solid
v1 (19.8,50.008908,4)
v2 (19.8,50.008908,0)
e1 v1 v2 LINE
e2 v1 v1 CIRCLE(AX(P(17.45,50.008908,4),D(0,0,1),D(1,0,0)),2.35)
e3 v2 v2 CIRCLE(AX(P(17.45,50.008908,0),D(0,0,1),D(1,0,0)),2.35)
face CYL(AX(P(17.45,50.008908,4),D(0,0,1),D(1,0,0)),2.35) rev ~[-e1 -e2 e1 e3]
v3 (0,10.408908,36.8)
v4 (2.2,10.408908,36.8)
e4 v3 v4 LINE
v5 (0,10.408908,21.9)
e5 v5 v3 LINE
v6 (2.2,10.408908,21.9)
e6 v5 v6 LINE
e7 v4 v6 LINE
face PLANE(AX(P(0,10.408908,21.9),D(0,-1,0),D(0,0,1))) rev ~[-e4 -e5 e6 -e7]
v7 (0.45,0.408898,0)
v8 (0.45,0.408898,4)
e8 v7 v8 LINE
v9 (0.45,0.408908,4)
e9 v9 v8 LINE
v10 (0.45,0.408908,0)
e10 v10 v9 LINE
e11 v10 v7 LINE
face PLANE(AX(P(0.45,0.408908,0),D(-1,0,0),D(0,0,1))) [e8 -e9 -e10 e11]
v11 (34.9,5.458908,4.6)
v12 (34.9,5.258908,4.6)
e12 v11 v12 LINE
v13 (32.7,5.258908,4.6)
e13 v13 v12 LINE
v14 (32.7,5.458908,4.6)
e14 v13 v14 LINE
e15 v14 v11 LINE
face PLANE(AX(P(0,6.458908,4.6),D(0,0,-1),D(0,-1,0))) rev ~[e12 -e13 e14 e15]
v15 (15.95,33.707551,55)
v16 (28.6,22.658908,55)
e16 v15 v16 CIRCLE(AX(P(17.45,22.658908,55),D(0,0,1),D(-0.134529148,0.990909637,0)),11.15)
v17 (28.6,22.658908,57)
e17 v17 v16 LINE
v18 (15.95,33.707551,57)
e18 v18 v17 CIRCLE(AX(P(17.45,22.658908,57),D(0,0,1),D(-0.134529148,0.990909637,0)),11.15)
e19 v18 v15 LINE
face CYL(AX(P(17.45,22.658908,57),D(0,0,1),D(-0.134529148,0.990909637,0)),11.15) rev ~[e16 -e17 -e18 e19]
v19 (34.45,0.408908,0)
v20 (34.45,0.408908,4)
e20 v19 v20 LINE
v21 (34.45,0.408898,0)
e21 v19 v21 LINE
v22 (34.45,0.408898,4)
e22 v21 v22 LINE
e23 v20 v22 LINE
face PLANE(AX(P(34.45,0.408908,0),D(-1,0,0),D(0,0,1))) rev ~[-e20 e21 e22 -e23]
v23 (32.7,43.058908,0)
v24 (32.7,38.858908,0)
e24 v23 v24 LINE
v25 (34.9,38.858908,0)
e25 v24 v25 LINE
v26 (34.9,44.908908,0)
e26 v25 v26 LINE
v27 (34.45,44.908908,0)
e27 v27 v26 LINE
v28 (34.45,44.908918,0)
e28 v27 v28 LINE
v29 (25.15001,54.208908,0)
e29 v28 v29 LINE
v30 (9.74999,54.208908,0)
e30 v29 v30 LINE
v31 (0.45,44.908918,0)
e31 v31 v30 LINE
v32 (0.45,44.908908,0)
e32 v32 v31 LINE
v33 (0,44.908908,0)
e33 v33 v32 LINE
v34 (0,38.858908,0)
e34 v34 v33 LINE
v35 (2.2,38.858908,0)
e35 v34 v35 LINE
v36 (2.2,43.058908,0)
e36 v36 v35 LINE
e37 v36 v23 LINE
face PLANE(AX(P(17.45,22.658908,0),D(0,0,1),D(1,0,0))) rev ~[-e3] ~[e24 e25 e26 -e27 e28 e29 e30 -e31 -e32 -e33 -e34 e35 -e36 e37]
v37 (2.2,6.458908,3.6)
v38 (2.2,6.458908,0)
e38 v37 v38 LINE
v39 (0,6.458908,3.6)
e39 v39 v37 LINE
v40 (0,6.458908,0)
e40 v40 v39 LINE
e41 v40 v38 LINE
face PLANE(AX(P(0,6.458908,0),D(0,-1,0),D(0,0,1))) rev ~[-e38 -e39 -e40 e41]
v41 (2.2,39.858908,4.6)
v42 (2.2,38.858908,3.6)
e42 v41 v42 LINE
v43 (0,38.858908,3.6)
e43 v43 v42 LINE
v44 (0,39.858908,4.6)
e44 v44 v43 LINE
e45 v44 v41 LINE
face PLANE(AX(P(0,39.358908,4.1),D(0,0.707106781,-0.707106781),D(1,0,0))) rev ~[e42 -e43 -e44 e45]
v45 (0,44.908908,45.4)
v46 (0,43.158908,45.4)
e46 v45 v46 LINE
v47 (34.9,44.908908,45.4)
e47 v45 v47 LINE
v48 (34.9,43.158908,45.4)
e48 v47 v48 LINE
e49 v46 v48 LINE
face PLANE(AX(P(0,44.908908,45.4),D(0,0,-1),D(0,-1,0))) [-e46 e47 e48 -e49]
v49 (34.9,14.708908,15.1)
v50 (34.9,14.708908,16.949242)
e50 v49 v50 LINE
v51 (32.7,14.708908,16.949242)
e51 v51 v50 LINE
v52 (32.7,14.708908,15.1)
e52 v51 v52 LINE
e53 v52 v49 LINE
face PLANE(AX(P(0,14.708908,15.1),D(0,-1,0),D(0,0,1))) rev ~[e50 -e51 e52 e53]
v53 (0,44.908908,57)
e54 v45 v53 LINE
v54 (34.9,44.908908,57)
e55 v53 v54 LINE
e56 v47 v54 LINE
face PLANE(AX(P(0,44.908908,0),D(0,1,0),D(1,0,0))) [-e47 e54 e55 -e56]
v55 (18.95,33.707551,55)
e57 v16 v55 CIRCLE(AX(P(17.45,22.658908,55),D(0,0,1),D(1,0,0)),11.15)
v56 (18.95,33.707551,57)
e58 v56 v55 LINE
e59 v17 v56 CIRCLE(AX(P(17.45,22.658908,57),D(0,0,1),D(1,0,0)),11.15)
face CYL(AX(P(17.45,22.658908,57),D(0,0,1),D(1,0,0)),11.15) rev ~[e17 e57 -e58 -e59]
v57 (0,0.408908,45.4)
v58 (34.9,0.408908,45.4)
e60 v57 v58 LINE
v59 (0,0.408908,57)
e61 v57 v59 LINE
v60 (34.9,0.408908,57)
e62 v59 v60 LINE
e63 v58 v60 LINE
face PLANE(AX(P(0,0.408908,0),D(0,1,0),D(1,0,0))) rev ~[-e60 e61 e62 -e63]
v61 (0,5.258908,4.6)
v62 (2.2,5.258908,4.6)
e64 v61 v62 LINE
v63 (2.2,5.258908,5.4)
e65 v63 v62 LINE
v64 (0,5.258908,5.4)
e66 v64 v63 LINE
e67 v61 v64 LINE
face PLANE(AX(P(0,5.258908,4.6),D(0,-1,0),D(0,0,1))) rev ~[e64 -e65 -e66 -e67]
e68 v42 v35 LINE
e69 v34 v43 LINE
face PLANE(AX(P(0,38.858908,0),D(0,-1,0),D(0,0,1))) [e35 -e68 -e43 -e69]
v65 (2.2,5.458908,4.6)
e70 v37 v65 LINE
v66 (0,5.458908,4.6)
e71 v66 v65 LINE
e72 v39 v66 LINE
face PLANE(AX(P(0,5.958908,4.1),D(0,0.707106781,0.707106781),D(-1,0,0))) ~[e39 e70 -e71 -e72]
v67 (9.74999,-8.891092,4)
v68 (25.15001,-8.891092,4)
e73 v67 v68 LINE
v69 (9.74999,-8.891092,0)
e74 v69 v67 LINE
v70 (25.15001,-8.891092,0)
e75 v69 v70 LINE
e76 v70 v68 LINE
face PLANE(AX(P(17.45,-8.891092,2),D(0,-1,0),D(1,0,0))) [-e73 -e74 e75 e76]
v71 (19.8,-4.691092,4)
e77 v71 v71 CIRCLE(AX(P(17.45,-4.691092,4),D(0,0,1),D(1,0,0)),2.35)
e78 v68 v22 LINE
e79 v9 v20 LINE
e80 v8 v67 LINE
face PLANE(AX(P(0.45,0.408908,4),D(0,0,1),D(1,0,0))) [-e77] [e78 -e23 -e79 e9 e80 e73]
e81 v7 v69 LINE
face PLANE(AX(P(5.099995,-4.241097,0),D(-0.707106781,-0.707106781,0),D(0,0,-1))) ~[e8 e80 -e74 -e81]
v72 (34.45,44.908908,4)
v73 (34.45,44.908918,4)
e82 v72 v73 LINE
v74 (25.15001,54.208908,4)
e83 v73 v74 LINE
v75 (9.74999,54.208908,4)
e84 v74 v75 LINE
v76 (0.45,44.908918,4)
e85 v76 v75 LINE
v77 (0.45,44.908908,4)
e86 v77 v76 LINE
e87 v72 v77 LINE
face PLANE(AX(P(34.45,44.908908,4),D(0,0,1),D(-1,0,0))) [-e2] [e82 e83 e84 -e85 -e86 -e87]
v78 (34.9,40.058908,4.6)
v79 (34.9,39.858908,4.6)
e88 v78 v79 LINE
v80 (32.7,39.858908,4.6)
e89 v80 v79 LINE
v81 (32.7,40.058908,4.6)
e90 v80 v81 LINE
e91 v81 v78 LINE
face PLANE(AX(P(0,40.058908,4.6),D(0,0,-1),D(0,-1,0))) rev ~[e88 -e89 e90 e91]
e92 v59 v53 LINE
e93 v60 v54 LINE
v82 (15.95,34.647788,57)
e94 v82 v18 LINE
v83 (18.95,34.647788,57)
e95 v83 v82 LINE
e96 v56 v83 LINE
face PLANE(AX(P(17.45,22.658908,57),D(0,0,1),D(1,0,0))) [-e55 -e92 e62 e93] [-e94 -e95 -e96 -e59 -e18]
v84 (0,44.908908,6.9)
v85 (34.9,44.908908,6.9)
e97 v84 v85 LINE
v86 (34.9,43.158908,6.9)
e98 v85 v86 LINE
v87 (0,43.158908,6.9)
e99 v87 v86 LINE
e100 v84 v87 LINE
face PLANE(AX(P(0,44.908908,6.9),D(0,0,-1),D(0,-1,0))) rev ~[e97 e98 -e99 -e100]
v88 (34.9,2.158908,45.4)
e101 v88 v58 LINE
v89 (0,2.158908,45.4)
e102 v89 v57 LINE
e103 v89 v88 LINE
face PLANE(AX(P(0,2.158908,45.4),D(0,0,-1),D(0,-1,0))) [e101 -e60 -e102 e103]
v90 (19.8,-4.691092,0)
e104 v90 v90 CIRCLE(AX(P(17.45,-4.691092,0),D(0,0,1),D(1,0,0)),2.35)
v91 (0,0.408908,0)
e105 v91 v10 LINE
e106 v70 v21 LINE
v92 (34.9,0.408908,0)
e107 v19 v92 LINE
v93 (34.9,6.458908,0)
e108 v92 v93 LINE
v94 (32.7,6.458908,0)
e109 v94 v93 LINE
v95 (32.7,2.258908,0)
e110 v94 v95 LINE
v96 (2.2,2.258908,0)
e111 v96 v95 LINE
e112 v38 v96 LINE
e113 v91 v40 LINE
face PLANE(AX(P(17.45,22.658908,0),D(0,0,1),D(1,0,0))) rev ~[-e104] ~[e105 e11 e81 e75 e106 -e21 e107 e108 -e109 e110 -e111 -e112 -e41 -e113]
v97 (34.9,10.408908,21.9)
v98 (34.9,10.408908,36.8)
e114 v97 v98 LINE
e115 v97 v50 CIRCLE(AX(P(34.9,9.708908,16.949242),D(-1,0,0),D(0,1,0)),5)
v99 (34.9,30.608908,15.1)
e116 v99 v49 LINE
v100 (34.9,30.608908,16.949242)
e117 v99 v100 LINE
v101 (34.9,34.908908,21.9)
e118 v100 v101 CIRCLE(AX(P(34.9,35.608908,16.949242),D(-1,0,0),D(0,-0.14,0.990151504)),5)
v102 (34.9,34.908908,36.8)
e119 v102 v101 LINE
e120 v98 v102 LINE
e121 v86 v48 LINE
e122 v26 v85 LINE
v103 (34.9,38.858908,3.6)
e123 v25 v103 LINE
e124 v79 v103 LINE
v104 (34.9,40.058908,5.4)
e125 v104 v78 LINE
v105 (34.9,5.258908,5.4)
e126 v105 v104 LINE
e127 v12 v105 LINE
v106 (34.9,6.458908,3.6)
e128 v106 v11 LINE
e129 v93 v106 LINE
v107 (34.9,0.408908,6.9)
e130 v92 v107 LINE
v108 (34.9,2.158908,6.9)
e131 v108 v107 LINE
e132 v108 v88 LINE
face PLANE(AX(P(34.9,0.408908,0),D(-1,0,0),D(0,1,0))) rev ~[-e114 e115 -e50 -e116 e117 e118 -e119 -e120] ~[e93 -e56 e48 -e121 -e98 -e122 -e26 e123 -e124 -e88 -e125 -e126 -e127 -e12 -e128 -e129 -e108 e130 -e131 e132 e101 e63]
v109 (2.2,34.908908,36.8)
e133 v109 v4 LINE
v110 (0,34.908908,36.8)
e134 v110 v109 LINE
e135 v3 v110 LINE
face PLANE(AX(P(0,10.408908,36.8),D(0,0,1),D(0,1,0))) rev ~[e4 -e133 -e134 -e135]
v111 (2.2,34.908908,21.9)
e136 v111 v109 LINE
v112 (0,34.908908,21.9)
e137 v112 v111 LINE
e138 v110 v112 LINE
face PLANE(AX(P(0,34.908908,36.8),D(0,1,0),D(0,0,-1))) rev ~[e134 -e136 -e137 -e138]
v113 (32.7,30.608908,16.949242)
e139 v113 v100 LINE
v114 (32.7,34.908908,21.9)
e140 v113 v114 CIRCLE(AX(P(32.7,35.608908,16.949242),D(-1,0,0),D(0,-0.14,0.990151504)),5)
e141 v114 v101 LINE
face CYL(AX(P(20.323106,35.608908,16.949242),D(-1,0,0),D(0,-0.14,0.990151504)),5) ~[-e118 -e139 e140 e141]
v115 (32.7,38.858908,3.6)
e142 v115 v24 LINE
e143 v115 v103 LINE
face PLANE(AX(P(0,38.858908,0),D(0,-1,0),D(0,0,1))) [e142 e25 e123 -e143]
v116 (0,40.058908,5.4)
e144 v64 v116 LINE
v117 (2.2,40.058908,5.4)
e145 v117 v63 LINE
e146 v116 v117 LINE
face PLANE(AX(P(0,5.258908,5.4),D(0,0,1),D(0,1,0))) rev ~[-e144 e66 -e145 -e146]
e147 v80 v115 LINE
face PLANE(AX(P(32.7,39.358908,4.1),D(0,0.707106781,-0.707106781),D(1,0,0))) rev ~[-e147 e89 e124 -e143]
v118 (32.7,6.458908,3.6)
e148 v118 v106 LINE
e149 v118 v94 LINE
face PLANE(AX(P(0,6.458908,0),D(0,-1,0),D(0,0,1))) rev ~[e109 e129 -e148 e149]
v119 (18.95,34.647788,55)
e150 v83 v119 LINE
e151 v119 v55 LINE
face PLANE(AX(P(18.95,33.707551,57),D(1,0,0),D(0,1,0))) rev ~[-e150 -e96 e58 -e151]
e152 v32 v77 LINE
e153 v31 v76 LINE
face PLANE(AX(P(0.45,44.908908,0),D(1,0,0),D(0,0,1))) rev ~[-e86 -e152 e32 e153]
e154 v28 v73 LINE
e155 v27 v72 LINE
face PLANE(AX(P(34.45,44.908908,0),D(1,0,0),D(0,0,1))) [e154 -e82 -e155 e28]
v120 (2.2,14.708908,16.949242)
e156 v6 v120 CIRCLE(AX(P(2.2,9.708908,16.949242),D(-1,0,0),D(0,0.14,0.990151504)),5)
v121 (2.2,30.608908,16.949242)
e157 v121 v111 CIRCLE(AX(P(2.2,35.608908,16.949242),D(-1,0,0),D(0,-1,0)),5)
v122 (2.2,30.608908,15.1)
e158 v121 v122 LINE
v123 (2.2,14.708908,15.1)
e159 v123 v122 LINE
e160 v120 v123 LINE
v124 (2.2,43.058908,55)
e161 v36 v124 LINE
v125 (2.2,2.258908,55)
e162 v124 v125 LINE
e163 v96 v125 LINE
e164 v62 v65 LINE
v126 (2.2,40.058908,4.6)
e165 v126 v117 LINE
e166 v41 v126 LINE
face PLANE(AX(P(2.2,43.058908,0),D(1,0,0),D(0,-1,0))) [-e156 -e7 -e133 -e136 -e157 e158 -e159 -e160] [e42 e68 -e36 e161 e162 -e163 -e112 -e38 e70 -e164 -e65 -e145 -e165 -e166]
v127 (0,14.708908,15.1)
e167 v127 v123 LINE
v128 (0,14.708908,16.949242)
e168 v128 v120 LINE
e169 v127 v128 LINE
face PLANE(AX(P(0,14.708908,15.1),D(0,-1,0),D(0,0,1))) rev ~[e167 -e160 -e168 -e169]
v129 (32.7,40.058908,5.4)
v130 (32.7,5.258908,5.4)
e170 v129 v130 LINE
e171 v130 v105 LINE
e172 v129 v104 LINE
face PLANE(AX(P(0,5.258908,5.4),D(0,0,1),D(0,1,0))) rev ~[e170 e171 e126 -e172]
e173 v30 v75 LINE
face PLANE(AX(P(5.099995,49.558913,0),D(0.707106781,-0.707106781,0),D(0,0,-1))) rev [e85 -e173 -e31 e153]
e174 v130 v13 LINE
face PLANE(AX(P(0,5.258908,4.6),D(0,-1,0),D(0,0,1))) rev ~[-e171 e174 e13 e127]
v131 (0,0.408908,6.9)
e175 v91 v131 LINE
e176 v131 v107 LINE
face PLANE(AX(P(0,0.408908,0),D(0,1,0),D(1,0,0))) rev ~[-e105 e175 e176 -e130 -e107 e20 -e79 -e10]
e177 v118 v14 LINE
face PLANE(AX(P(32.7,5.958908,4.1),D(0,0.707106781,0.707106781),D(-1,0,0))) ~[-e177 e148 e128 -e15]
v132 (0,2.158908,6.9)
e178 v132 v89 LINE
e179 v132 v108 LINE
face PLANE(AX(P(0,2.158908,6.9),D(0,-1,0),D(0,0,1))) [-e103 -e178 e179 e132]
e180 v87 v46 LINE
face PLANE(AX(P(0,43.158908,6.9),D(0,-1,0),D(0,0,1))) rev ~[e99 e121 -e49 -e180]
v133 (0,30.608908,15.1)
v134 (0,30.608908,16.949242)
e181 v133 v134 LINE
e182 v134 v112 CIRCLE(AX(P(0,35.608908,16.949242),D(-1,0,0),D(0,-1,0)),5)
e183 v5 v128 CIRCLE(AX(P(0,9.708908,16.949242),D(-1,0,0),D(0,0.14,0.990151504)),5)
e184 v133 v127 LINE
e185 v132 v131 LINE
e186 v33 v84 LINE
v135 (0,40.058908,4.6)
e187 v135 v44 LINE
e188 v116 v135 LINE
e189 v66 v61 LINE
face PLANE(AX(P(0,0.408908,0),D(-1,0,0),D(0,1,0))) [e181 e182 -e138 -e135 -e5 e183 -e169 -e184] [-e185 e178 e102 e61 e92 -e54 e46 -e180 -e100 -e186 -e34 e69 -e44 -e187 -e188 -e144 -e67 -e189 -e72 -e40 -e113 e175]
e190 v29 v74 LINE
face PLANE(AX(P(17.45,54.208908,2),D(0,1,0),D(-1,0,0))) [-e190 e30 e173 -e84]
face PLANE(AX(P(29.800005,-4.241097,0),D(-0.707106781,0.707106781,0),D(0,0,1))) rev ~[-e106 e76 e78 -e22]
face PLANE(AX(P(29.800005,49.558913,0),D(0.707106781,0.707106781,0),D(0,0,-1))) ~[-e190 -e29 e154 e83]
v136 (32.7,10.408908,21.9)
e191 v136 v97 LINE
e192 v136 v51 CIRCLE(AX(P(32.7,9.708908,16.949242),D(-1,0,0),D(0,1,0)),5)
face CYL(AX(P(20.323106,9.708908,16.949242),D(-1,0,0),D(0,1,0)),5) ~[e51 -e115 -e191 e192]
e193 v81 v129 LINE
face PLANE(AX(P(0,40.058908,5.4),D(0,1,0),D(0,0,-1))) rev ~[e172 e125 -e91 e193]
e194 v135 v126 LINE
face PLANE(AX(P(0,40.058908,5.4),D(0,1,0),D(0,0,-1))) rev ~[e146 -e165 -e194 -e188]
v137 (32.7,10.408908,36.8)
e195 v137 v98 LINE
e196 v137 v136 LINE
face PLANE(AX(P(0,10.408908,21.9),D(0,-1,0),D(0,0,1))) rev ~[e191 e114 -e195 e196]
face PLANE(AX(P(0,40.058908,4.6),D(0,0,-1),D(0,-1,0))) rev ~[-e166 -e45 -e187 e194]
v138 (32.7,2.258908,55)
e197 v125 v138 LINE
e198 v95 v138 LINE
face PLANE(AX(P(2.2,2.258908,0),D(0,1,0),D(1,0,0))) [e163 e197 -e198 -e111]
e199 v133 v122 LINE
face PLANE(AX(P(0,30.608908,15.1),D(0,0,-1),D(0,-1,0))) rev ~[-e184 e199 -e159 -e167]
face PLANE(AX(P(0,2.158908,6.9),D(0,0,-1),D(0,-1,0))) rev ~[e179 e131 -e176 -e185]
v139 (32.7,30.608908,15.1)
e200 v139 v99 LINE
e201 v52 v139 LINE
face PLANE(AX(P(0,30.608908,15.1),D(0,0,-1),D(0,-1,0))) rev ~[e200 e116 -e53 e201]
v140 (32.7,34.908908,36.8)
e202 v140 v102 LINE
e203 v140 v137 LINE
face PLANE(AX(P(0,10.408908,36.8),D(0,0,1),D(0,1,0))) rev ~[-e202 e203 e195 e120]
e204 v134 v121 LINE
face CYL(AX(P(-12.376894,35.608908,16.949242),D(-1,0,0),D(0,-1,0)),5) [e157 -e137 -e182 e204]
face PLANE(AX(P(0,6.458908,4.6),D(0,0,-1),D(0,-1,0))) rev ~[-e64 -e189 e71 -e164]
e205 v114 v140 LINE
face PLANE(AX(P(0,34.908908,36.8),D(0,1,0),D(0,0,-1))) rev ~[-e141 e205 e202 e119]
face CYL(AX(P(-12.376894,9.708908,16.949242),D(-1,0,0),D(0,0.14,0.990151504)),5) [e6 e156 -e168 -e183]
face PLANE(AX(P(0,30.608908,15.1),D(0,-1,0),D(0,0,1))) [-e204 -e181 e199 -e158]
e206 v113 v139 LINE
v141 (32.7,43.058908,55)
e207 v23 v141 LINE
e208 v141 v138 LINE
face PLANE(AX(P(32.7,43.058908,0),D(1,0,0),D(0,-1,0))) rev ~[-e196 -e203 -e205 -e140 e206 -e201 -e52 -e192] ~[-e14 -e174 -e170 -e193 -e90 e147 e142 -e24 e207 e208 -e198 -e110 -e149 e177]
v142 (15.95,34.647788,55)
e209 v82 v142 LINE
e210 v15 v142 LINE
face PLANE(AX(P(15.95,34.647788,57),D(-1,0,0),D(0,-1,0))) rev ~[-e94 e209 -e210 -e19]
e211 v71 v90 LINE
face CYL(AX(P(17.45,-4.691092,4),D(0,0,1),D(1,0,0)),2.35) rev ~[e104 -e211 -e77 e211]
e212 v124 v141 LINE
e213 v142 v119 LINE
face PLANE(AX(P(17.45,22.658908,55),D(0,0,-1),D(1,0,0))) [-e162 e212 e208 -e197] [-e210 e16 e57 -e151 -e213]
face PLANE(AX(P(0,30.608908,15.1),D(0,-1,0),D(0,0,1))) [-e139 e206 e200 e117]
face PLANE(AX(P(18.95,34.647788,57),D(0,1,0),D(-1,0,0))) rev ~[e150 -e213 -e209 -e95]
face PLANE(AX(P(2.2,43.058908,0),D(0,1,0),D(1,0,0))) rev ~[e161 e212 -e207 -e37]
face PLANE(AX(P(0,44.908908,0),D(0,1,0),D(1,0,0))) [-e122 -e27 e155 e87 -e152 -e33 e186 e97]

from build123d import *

# Parameters (mm, degrees)
F0_W         = 34.9
F0_H         = 44.5
F1_DEPTH     = 57
F2_W         = 30.5
F2_H         = 40.8
F3_DEPTH     = 55
F5_DEPTH     = 57.001
F6_W         = 1.75
F6_H         = 38.5
F7_DEPTH     = 34.901
F8_W         = 15.9
F8_H         = 6.8
F8_W_2       = 32.4
F8_H_2       = 4.6
F9_DEPTH     = 34.901
F10_W        = 34
F10_H        = 4
F11_DEPTH    = 9.3
F12_W        = 34
F12_H        = 4
F13_DEPTH    = 9.3
F14_SIZE     = 9.29999
F15_SIZE     = 1
F16_R        = 2.35
F17_DEPTH    = 4.001
F18_T1_DEPTH = 26.953787589
F18_T3_DEPTH = 26.953787589


# Not quite as in the source:
# - a fillet or chamfer that OpenCascade refuses, or shapes differently, is made with other operations: its cross-section is extruded or revolved along the edge and cut away or added
# - a fillet or chamfer is up to 0.001 mm smaller than in the source, because OpenCascade refuses the exact size


with BuildPart() as f1:
    # F0 (on Top) → F1 (new body)
    with BuildSketch(Plane.XY):
        with Locations((17.45, 22.6589083523)):
            Rectangle(F0_W, F0_H)
    extrude(amount=F1_DEPTH)

    # F2 (on face) → F3 (cut)
    with BuildSketch(Plane(origin=(0, 0, 0), x_dir=(1, 0, 0), z_dir=(0, 0, -1))):
        with Locations((17.45, -22.6589083523)):
            Rectangle(F2_W, F2_H)
    extrude(amount=-F3_DEPTH, mode=Mode.SUBTRACT)

    # F4 (on face) → F5 (cut, through all)
    with BuildSketch(Plane.XY.offset(57)):
        with BuildLine():
            Line((18.95, 33.2867875695), (18.95, 33.7075508028))
            ThreePointArc((18.95, 33.7075508028), (17.45, 33.8089083523), (15.95, 33.7075508028))
            Line((15.95, 33.7075508028), (15.95, 33.2867875695))
            Line((15.95, 33.2867875695), (18.95, 33.2867875695))
        make_face()
        with BuildLine():
            ThreePointArc((15.95, 33.7075508028), (10.1152368818, 14.2610663676), (28.6, 22.6589083523))
            ThreePointArc((28.6, 22.6589083523), (25.8478419847, 29.9936714704), (18.95, 33.7075508028))
            Line((18.95, 33.7075508028), (18.95, 33.2867875695))
            Line((18.95, 33.2867875695), (15.95, 33.2867875695))
            Line((15.95, 33.2867875695), (15.95, 33.7075508028))
        make_face()
        with BuildLine():
            ThreePointArc((15.95, 33.7075508028), (17.45, 33.8089083523), (18.95, 33.7075508028))
            Line((18.95, 33.7075508028), (18.95, 34.6477875695))
            Line((18.95, 34.6477875695), (15.95, 34.6477875695))
            Line((15.95, 34.6477875695), (15.95, 33.7075508028))
        make_face()
    extrude(amount=-F5_DEPTH, mode=Mode.SUBTRACT)

    # F6 (on face) → F7 (cut, through all)
    with BuildSketch(Plane(origin=(0, 0, 0), x_dir=(0, -1, 0), z_dir=(-1, 0, 0))):
        with Locations((-44.0339083523, 26.15)):
            Rectangle(F6_W, F6_H)
        with Locations((-1.2839083523, 26.15)):
            Rectangle(F6_W, F6_H)
    extrude(amount=-F7_DEPTH, mode=Mode.SUBTRACT)

    # F8 (on face) → F9 (cut, through all)
    with BuildSketch(Plane(origin=(0, 0, 0), x_dir=(0, -1, 0), z_dir=(-1, 0, 0))):
        Polygon((-10.4089083523, 36.8), (-34.9089083523, 36.8), (-34.9089083523, 21.9), (-30.6089083523, 21.9), (-14.7089083523, 21.9), (-10.4089083523, 21.9), align=None)
        with Locations((-22.6589083523, 18.5)):
            Rectangle(F8_W, F8_H)
        with Locations((-22.6589083523, 2.3)):
            Rectangle(F8_W_2, F8_H_2)
        Polygon((-40.0589083523, 4.6), (-38.8589083523, 4.6), (-6.4589083523, 4.6), (-5.2589083523, 4.6), (-5.2589083523, 5.4), (-40.0589083523, 5.4), align=None)
    extrude(amount=-F9_DEPTH, mode=Mode.SUBTRACT)

    # F10 (on face) → F11 (join)
    with BuildSketch(Plane.XZ.offset(-0.4089083523)):
        with Locations((17.45, 2)):
            Rectangle(F10_W, F10_H)
    extrude(amount=F11_DEPTH)

    # F12 (on face) → F13 (join)
    with BuildSketch(Plane(origin=(0, 44.9089083523, 0), x_dir=(-1, 0, 0), z_dir=(0, 1, 0))):
        with Locations((-17.45, 2)):
            Rectangle(F12_W, F12_H)
    extrude(amount=F13_DEPTH)

    # F14 (size 9.3 in the source; OpenCascade refuses exactly that, so slightly less here)
    f14_edges = [f1.edges().sort_by_distance(p)[0] for p in [
        (34.45, 54.208908, 2),
        (0.45, 54.208908, 2),
        (34.45, -8.891092, 2),
        (0.45, -8.891092, 2),
    ]]
    chamfer(f14_edges, length=F14_SIZE)

    # F15
    f15_edges = [f1.edges().sort_by_distance(p)[0] for p in [
        (1.1, 38.858908, 4.6),
        (1.1, 6.458908, 4.6),
        (33.8, 6.458908, 4.6),
        (33.8, 38.858908, 4.6),
    ]]
    chamfer(f15_edges, length=F15_SIZE)

    # F16 (on face) → F17 (cut, through all)
    with BuildSketch(Plane.XY.offset(4)):
        with Locations((17.45, -4.6910916477)):
            Circle(F16_R)
        with Locations((17.45, 50.0089083523)):
            Circle(F16_R)
    extrude(amount=-F17_DEPTH, mode=Mode.SUBTRACT)

    # F18: fillet of radius 5 on 4 edges, made by hand

    # F18_s2 → F18_t1 (cut)
    with BuildSketch(Plane.YZ.offset(-12.3768937945)):
        with BuildLine():
            ThreePointArc((30.6089083523, 16.9492424822), (31.8339911346, 20.2279617444), (34.9089083523, 21.9))
            Line((34.9089083523, 21.9), (30.6089083523, 21.9))
            Line((30.6089083523, 21.9), (30.6089083523, 16.9492424822))
        make_face()
        with BuildLine():
            ThreePointArc((10.4089083523, 21.9), (13.4838255699, 20.2279617444), (14.7089083523, 16.9492424822))
            Line((14.7089083523, 16.9492424822), (14.7089083523, 21.9))
            Line((14.7089083523, 21.9), (10.4089083523, 21.9))
        make_face()
    extrude(amount=F18_T1_DEPTH, mode=Mode.SUBTRACT)

    # F18_s4 → F18_t3 (cut)
    with BuildSketch(Plane.YZ.offset(20.3231062055)):
        with BuildLine():
            ThreePointArc((14.7089083523, 16.9492424822), (13.4838255699, 20.2279617444), (10.4089083523, 21.9))
            Line((10.4089083523, 21.9), (14.7089083523, 21.9))
            Line((14.7089083523, 21.9), (14.7089083523, 16.9492424822))
        make_face()
        with BuildLine():
            ThreePointArc((34.9089083523, 21.9), (31.8339911346, 20.2279617444), (30.6089083523, 16.9492424822))
            Line((30.6089083523, 16.9492424822), (30.6089083523, 21.9))
            Line((30.6089083523, 21.9), (34.9089083523, 21.9))
        make_face()
    extrude(amount=F18_T3_DEPTH, mode=Mode.SUBTRACT)


solid = f1.part
